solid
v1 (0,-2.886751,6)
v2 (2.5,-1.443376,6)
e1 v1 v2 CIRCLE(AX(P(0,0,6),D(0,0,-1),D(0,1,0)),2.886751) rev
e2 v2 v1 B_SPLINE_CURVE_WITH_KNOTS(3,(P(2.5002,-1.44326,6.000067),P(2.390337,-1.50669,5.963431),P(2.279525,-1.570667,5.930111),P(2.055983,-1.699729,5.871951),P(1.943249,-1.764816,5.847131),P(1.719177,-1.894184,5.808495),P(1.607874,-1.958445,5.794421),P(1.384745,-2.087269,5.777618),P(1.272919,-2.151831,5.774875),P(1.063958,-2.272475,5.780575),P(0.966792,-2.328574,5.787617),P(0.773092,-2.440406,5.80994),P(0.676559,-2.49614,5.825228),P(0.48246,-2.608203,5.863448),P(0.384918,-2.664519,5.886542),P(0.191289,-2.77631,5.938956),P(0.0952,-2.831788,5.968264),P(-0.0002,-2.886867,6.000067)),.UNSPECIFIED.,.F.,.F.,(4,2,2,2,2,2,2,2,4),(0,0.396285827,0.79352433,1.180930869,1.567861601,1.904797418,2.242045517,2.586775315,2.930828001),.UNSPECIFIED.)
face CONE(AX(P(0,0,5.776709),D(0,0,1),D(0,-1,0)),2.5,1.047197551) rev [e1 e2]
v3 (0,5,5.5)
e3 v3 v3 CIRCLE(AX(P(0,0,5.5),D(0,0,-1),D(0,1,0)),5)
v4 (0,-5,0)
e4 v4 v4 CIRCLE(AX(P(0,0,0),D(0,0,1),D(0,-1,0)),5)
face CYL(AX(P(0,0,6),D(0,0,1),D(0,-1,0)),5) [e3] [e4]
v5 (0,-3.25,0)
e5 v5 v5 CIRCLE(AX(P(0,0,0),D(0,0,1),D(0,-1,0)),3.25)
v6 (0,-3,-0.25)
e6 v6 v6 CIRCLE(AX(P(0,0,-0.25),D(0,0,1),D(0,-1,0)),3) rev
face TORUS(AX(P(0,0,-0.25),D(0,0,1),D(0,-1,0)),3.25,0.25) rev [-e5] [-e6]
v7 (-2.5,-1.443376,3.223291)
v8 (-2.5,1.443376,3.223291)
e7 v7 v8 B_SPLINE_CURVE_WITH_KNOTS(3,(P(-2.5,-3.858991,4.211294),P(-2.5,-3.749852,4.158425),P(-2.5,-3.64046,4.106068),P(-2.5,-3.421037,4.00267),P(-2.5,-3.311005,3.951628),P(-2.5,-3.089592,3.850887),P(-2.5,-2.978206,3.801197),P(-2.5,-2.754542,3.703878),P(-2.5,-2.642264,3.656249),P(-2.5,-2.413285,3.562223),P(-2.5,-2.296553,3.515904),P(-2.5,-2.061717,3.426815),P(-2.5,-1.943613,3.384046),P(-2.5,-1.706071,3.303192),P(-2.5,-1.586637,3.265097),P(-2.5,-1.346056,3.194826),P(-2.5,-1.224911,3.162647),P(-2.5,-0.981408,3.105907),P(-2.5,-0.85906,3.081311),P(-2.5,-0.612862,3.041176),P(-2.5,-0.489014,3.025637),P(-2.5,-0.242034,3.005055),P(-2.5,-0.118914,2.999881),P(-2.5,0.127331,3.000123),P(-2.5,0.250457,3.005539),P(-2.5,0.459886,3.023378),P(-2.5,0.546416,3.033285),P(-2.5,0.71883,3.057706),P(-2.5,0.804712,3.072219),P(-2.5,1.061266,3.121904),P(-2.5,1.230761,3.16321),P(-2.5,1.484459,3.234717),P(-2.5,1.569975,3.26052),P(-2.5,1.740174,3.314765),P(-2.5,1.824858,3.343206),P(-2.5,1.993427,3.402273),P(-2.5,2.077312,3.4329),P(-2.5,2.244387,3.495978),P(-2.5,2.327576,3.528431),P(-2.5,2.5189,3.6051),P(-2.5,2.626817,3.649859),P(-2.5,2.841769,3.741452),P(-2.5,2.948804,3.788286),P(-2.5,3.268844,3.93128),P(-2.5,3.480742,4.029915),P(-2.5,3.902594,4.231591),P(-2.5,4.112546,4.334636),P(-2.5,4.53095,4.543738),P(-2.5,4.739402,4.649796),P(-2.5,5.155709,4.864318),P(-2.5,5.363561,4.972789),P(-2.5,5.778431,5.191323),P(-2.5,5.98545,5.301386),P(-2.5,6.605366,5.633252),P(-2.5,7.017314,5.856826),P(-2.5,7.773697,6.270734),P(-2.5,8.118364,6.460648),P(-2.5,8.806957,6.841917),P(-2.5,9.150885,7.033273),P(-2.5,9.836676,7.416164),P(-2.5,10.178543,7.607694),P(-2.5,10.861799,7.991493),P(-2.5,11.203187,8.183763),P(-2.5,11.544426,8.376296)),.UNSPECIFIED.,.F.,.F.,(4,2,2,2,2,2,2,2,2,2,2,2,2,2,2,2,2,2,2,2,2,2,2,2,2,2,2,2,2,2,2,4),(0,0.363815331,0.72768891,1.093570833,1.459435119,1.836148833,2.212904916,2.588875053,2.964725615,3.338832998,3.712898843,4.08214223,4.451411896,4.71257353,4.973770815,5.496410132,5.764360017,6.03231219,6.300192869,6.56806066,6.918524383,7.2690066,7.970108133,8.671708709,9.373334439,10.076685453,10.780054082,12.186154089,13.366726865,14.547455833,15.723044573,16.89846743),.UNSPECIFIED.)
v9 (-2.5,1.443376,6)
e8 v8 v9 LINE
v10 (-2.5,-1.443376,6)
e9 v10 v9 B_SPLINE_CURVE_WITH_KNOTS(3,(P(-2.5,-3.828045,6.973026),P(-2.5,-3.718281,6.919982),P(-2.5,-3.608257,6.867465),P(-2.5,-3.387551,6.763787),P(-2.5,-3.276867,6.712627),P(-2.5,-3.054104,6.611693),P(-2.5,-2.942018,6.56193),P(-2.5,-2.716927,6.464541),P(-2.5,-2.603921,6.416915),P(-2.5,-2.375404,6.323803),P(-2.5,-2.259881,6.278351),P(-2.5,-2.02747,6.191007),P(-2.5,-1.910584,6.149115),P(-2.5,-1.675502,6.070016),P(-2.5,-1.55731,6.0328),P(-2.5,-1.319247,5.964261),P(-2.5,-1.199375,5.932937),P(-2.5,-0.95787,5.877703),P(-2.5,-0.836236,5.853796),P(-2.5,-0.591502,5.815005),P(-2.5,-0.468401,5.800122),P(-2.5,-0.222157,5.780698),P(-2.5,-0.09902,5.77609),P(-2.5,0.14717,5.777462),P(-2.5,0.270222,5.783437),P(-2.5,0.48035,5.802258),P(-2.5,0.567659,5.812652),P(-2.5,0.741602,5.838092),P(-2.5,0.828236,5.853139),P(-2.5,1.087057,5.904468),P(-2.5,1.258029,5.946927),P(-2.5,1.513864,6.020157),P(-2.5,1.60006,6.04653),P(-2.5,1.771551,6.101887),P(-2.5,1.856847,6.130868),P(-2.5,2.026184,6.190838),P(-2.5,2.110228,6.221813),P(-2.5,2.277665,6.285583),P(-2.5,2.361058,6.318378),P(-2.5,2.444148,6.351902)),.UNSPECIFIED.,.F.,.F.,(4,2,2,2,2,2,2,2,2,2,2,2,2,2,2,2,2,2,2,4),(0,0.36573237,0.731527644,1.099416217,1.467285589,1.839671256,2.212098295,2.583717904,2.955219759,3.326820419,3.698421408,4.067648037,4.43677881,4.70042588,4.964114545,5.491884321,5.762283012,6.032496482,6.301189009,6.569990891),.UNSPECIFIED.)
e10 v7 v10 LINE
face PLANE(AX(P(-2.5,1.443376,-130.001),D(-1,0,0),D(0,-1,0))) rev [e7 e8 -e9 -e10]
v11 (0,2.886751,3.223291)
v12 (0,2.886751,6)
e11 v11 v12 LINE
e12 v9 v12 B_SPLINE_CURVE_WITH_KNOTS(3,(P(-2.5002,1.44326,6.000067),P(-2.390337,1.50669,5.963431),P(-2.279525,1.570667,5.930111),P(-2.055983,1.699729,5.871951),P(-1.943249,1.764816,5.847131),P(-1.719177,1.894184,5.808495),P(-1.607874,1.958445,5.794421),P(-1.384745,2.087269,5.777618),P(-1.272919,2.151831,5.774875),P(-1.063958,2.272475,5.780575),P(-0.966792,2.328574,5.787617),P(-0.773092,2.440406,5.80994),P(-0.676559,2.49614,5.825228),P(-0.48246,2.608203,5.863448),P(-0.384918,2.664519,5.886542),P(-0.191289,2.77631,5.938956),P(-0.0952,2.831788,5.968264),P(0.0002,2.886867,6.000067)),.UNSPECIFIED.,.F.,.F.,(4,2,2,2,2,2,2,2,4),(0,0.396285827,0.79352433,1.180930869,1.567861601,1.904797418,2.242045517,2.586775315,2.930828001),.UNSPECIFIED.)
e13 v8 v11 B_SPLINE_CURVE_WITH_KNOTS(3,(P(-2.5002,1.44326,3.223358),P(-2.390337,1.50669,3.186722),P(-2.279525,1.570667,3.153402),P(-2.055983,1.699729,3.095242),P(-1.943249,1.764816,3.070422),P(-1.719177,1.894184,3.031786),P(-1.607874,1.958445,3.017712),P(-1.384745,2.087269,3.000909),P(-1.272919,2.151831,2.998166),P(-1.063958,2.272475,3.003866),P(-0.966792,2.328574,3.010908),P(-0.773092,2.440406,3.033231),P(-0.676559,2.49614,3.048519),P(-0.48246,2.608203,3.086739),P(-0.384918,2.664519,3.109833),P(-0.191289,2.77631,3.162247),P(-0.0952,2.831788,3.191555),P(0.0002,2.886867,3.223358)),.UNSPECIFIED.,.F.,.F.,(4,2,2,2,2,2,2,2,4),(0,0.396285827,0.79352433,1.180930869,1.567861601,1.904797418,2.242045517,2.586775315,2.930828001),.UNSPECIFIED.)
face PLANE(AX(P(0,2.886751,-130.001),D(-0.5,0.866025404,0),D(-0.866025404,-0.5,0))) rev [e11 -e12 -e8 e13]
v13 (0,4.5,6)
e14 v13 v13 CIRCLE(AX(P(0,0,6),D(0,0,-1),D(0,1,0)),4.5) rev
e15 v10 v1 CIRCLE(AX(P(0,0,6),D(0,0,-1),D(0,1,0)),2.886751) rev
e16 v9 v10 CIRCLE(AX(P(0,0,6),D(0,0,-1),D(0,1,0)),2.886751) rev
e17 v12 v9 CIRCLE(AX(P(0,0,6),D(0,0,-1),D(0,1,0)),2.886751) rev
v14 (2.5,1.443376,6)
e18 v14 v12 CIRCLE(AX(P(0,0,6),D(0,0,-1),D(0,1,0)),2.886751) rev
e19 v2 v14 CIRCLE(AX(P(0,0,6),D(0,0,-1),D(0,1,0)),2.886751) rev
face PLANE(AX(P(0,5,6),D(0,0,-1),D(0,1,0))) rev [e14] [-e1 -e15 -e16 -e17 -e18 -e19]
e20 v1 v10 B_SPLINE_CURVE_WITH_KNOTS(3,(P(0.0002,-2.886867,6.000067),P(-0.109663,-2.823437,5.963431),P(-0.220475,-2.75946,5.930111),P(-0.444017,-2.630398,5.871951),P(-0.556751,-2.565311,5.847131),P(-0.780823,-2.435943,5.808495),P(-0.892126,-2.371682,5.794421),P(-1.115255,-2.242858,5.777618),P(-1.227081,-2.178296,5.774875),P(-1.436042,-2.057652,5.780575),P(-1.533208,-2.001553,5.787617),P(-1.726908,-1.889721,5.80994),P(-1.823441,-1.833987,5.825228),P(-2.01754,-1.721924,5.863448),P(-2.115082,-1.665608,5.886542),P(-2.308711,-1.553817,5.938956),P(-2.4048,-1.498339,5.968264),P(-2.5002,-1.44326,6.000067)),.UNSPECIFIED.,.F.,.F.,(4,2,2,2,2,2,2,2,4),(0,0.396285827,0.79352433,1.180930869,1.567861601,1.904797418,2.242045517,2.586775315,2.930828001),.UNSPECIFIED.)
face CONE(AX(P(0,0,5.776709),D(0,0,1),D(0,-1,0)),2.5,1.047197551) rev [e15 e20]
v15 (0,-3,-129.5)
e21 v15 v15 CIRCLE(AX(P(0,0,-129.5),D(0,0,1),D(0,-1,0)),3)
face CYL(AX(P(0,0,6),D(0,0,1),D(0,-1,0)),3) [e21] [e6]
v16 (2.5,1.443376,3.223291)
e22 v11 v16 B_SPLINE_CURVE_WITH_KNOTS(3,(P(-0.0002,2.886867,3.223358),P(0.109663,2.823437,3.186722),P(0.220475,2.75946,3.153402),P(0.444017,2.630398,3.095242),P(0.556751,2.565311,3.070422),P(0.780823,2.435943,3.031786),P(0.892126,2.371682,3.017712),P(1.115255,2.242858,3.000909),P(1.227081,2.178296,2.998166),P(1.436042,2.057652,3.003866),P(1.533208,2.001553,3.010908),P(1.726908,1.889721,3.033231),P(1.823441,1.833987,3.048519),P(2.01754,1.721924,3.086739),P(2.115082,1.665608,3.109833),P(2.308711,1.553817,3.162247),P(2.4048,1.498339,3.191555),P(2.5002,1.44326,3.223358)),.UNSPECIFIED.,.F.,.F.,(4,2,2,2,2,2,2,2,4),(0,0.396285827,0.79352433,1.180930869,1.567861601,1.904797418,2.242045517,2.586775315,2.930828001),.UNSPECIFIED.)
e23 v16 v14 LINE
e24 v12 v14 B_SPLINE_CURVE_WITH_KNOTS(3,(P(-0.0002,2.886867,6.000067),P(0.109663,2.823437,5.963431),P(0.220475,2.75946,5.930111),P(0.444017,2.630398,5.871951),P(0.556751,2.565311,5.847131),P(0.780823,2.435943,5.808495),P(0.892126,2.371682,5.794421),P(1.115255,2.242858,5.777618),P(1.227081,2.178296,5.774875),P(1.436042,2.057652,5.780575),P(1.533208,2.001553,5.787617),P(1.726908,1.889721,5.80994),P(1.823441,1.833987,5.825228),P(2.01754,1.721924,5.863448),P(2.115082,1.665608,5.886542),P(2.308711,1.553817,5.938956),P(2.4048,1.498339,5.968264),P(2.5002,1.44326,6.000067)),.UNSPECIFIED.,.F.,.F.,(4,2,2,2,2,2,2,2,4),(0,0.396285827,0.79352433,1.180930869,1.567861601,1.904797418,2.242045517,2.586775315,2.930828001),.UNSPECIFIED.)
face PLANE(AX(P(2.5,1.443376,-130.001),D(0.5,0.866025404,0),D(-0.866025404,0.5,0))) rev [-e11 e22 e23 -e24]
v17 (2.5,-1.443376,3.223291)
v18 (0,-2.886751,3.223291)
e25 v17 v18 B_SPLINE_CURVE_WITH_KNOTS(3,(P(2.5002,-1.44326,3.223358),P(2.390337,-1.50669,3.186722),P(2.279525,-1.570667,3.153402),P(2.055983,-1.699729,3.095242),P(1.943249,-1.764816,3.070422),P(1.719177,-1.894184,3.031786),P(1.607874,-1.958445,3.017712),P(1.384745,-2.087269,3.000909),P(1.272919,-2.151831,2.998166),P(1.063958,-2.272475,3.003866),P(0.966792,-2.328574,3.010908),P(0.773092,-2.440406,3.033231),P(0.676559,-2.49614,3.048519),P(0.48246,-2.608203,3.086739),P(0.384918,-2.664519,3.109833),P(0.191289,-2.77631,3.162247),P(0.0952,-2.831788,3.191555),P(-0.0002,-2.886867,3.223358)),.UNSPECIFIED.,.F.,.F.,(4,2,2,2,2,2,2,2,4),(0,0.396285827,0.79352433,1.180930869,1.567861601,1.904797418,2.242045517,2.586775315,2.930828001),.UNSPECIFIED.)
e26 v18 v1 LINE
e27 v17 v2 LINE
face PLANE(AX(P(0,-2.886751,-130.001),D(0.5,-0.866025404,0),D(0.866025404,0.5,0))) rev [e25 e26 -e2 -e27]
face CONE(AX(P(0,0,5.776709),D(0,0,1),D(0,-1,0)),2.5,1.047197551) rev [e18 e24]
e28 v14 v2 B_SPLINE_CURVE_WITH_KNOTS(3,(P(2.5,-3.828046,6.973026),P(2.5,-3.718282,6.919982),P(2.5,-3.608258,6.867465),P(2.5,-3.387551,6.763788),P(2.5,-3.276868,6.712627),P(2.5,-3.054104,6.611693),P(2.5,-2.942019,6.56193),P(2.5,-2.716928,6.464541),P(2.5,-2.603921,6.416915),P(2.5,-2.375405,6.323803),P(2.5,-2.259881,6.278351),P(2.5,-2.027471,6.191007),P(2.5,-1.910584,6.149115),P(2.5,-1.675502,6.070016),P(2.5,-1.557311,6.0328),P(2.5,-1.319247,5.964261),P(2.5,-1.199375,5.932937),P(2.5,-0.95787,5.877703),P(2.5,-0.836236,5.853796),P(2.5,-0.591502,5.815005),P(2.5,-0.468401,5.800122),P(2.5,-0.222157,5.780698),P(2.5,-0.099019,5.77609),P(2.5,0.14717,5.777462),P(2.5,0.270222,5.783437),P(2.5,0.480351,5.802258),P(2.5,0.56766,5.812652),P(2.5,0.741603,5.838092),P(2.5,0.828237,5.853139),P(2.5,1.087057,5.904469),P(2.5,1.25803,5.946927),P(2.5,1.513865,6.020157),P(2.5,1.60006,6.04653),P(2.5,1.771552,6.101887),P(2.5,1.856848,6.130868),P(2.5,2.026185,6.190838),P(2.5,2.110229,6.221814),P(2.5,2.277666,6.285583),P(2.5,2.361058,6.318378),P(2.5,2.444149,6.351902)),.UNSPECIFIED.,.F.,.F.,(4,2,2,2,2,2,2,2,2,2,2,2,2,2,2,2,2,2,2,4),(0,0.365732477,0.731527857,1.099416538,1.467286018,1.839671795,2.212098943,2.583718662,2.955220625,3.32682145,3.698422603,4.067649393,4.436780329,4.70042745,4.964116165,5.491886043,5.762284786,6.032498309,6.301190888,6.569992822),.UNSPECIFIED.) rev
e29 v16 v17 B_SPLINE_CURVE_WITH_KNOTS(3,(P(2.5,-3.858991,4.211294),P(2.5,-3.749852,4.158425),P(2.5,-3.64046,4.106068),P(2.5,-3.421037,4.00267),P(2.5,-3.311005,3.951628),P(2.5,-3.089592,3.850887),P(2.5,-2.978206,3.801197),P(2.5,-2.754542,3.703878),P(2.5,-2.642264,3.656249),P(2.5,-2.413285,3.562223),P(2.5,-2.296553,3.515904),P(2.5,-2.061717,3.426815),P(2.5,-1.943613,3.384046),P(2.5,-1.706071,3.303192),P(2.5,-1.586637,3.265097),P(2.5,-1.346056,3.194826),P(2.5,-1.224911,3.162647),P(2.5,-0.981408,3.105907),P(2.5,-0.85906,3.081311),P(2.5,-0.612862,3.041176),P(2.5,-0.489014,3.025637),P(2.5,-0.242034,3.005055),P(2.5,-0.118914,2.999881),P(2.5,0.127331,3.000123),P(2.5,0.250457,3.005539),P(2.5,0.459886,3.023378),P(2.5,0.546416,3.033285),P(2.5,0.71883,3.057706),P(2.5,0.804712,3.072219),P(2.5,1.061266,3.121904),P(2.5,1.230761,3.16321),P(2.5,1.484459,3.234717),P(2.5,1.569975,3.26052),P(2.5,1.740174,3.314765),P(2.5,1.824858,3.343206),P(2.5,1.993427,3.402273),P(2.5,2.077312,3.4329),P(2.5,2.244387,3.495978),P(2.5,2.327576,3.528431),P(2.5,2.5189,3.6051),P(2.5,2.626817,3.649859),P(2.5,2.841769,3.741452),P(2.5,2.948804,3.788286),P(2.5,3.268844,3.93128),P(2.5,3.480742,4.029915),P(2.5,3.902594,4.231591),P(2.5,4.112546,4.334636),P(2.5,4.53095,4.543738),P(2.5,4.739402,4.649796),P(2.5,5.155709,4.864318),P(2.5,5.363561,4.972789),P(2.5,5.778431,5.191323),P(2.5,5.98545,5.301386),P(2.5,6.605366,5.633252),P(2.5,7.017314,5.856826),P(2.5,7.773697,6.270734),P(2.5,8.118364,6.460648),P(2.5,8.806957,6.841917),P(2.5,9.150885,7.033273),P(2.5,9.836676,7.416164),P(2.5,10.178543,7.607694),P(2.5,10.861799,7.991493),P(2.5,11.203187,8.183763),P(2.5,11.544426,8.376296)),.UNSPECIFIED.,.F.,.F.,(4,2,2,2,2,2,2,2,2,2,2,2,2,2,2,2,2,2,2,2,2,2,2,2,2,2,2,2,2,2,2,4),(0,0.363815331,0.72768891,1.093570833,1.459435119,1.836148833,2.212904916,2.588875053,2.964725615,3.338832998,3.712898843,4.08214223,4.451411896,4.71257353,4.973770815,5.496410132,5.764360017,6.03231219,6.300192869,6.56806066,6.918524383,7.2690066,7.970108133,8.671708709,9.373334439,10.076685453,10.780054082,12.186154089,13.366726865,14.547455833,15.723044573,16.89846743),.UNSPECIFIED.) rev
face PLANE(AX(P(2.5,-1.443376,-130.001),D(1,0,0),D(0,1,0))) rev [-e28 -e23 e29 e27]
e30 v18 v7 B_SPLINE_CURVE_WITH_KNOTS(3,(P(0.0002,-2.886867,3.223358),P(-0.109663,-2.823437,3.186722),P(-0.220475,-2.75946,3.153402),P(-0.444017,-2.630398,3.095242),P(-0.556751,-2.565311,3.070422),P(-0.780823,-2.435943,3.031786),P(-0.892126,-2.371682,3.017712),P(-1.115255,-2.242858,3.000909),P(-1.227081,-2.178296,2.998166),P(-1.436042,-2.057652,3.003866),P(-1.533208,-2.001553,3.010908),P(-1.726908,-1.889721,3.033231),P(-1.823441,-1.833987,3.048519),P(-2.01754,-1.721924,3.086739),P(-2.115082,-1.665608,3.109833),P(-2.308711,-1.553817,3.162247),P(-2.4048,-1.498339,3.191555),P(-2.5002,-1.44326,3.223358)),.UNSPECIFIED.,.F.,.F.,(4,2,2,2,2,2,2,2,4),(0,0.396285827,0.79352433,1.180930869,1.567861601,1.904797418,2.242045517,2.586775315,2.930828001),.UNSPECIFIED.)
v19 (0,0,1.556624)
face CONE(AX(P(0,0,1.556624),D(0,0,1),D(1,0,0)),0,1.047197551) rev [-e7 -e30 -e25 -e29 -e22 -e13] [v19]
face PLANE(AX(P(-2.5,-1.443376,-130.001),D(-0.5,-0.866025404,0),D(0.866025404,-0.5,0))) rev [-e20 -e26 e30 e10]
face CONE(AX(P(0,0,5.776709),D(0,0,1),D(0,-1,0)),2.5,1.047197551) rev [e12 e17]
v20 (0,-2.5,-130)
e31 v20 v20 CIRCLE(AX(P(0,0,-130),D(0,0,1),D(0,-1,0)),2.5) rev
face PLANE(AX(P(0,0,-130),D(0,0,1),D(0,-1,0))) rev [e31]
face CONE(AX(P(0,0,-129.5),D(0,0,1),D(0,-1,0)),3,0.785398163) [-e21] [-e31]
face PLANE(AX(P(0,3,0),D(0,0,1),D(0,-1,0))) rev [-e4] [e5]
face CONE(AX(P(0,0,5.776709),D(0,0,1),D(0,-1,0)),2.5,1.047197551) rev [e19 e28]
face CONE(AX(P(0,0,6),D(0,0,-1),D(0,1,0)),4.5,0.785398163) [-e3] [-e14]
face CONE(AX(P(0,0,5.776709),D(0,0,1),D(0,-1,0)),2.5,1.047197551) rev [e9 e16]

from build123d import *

# Parameters (mm, degrees)
CHAMFER1_SIZE      = 0.5
CUT_EXTRUDE1_REACH = 138.184
FILLET2_R          = 0.25


with BuildPart() as part:
    # Sketch1 → Revolve1 (revolve)
    with BuildSketch(Plane(origin=(0, 0, 0), x_dir=(0, 0, -1), z_dir=(1, 0, 0))):
        Polygon((0, 5), (-6, 5), (-6, 0), (130, 0), (130, 3), (0, 3), align=None)
    revolve(axis=Axis((0, 0, 6), (0, 0, -1)))

    # Sketch7 → Cut-Revolve2 (revolve, cut)
    with BuildSketch(Plane(origin=(0, 0, 0), x_dir=(0, 0, -1), z_dir=(1, 0, 0))):
        Polygon((-6, 0), (-6, 2.5), (-3, 2.5), (-1.556624327, 0), align=None)
    revolve(axis=Axis((0, 0, 6), (0, 0, -1)), mode=Mode.SUBTRACT)

    # Chamfer1
    chamfer1_edges = [part.edges().sort_by_distance(p)[0] for p in [
        (0, -3, -130),
        (0, -5, 6),
    ]]
    chamfer(chamfer1_edges, length=CHAMFER1_SIZE)

    # Cut-Extrude1: up to this cone (the profile starts inside it)
    cut_extrude1_end = Plane(origin=(0, 0, 6), z_dir=(0, 0, 1)).offset(-4.443374673) * Cone(1.732e-06, 261.234013639, 150.823527096, align=(Align.CENTER, Align.CENTER, Align.MIN), mode=Mode.PRIVATE)
    # Sketch8 → Cut-Extrude1 (cut, up to the surface)
    with BuildSketch(Plane.XY.offset(6), mode=Mode.PRIVATE) as cut_extrude1_sk1:
        Polygon((0, 2.886751346), (-2.5, 1.443375673), (-2.5, -1.443375673), (0, -2.886751346), (2.5, -1.443375673), (2.5, 1.443375673), align=None)
    cut_extrude1_tool1 = extrude(cut_extrude1_sk1.sketch, amount=-CUT_EXTRUDE1_REACH, mode=Mode.PRIVATE) & cut_extrude1_end
    add(cut_extrude1_tool1.solids().sort_by_distance((0, 0, 6))[0], mode=Mode.SUBTRACT)

    # Sketch9 → Cut-Revolve3 (revolve, cut)
    with BuildSketch(Plane(origin=(0, 0, 0), x_dir=(0, 0, -1), z_dir=(1, 0, 0))):
        Polygon((-6.5, 3.75277675), (-6.5, 2.5), (-5.776709006, 2.5), align=None)
    revolve(axis=Axis((0, 0, 6), (0, 0, -1)), mode=Mode.SUBTRACT)

    # Fillet2
    fillet2_edges = [part.edges().sort_by_distance(p)[0] for p in [
        (0, -3, 0),
    ]]
    fillet(fillet2_edges, radius=FILLET2_R)


solid = part.part
